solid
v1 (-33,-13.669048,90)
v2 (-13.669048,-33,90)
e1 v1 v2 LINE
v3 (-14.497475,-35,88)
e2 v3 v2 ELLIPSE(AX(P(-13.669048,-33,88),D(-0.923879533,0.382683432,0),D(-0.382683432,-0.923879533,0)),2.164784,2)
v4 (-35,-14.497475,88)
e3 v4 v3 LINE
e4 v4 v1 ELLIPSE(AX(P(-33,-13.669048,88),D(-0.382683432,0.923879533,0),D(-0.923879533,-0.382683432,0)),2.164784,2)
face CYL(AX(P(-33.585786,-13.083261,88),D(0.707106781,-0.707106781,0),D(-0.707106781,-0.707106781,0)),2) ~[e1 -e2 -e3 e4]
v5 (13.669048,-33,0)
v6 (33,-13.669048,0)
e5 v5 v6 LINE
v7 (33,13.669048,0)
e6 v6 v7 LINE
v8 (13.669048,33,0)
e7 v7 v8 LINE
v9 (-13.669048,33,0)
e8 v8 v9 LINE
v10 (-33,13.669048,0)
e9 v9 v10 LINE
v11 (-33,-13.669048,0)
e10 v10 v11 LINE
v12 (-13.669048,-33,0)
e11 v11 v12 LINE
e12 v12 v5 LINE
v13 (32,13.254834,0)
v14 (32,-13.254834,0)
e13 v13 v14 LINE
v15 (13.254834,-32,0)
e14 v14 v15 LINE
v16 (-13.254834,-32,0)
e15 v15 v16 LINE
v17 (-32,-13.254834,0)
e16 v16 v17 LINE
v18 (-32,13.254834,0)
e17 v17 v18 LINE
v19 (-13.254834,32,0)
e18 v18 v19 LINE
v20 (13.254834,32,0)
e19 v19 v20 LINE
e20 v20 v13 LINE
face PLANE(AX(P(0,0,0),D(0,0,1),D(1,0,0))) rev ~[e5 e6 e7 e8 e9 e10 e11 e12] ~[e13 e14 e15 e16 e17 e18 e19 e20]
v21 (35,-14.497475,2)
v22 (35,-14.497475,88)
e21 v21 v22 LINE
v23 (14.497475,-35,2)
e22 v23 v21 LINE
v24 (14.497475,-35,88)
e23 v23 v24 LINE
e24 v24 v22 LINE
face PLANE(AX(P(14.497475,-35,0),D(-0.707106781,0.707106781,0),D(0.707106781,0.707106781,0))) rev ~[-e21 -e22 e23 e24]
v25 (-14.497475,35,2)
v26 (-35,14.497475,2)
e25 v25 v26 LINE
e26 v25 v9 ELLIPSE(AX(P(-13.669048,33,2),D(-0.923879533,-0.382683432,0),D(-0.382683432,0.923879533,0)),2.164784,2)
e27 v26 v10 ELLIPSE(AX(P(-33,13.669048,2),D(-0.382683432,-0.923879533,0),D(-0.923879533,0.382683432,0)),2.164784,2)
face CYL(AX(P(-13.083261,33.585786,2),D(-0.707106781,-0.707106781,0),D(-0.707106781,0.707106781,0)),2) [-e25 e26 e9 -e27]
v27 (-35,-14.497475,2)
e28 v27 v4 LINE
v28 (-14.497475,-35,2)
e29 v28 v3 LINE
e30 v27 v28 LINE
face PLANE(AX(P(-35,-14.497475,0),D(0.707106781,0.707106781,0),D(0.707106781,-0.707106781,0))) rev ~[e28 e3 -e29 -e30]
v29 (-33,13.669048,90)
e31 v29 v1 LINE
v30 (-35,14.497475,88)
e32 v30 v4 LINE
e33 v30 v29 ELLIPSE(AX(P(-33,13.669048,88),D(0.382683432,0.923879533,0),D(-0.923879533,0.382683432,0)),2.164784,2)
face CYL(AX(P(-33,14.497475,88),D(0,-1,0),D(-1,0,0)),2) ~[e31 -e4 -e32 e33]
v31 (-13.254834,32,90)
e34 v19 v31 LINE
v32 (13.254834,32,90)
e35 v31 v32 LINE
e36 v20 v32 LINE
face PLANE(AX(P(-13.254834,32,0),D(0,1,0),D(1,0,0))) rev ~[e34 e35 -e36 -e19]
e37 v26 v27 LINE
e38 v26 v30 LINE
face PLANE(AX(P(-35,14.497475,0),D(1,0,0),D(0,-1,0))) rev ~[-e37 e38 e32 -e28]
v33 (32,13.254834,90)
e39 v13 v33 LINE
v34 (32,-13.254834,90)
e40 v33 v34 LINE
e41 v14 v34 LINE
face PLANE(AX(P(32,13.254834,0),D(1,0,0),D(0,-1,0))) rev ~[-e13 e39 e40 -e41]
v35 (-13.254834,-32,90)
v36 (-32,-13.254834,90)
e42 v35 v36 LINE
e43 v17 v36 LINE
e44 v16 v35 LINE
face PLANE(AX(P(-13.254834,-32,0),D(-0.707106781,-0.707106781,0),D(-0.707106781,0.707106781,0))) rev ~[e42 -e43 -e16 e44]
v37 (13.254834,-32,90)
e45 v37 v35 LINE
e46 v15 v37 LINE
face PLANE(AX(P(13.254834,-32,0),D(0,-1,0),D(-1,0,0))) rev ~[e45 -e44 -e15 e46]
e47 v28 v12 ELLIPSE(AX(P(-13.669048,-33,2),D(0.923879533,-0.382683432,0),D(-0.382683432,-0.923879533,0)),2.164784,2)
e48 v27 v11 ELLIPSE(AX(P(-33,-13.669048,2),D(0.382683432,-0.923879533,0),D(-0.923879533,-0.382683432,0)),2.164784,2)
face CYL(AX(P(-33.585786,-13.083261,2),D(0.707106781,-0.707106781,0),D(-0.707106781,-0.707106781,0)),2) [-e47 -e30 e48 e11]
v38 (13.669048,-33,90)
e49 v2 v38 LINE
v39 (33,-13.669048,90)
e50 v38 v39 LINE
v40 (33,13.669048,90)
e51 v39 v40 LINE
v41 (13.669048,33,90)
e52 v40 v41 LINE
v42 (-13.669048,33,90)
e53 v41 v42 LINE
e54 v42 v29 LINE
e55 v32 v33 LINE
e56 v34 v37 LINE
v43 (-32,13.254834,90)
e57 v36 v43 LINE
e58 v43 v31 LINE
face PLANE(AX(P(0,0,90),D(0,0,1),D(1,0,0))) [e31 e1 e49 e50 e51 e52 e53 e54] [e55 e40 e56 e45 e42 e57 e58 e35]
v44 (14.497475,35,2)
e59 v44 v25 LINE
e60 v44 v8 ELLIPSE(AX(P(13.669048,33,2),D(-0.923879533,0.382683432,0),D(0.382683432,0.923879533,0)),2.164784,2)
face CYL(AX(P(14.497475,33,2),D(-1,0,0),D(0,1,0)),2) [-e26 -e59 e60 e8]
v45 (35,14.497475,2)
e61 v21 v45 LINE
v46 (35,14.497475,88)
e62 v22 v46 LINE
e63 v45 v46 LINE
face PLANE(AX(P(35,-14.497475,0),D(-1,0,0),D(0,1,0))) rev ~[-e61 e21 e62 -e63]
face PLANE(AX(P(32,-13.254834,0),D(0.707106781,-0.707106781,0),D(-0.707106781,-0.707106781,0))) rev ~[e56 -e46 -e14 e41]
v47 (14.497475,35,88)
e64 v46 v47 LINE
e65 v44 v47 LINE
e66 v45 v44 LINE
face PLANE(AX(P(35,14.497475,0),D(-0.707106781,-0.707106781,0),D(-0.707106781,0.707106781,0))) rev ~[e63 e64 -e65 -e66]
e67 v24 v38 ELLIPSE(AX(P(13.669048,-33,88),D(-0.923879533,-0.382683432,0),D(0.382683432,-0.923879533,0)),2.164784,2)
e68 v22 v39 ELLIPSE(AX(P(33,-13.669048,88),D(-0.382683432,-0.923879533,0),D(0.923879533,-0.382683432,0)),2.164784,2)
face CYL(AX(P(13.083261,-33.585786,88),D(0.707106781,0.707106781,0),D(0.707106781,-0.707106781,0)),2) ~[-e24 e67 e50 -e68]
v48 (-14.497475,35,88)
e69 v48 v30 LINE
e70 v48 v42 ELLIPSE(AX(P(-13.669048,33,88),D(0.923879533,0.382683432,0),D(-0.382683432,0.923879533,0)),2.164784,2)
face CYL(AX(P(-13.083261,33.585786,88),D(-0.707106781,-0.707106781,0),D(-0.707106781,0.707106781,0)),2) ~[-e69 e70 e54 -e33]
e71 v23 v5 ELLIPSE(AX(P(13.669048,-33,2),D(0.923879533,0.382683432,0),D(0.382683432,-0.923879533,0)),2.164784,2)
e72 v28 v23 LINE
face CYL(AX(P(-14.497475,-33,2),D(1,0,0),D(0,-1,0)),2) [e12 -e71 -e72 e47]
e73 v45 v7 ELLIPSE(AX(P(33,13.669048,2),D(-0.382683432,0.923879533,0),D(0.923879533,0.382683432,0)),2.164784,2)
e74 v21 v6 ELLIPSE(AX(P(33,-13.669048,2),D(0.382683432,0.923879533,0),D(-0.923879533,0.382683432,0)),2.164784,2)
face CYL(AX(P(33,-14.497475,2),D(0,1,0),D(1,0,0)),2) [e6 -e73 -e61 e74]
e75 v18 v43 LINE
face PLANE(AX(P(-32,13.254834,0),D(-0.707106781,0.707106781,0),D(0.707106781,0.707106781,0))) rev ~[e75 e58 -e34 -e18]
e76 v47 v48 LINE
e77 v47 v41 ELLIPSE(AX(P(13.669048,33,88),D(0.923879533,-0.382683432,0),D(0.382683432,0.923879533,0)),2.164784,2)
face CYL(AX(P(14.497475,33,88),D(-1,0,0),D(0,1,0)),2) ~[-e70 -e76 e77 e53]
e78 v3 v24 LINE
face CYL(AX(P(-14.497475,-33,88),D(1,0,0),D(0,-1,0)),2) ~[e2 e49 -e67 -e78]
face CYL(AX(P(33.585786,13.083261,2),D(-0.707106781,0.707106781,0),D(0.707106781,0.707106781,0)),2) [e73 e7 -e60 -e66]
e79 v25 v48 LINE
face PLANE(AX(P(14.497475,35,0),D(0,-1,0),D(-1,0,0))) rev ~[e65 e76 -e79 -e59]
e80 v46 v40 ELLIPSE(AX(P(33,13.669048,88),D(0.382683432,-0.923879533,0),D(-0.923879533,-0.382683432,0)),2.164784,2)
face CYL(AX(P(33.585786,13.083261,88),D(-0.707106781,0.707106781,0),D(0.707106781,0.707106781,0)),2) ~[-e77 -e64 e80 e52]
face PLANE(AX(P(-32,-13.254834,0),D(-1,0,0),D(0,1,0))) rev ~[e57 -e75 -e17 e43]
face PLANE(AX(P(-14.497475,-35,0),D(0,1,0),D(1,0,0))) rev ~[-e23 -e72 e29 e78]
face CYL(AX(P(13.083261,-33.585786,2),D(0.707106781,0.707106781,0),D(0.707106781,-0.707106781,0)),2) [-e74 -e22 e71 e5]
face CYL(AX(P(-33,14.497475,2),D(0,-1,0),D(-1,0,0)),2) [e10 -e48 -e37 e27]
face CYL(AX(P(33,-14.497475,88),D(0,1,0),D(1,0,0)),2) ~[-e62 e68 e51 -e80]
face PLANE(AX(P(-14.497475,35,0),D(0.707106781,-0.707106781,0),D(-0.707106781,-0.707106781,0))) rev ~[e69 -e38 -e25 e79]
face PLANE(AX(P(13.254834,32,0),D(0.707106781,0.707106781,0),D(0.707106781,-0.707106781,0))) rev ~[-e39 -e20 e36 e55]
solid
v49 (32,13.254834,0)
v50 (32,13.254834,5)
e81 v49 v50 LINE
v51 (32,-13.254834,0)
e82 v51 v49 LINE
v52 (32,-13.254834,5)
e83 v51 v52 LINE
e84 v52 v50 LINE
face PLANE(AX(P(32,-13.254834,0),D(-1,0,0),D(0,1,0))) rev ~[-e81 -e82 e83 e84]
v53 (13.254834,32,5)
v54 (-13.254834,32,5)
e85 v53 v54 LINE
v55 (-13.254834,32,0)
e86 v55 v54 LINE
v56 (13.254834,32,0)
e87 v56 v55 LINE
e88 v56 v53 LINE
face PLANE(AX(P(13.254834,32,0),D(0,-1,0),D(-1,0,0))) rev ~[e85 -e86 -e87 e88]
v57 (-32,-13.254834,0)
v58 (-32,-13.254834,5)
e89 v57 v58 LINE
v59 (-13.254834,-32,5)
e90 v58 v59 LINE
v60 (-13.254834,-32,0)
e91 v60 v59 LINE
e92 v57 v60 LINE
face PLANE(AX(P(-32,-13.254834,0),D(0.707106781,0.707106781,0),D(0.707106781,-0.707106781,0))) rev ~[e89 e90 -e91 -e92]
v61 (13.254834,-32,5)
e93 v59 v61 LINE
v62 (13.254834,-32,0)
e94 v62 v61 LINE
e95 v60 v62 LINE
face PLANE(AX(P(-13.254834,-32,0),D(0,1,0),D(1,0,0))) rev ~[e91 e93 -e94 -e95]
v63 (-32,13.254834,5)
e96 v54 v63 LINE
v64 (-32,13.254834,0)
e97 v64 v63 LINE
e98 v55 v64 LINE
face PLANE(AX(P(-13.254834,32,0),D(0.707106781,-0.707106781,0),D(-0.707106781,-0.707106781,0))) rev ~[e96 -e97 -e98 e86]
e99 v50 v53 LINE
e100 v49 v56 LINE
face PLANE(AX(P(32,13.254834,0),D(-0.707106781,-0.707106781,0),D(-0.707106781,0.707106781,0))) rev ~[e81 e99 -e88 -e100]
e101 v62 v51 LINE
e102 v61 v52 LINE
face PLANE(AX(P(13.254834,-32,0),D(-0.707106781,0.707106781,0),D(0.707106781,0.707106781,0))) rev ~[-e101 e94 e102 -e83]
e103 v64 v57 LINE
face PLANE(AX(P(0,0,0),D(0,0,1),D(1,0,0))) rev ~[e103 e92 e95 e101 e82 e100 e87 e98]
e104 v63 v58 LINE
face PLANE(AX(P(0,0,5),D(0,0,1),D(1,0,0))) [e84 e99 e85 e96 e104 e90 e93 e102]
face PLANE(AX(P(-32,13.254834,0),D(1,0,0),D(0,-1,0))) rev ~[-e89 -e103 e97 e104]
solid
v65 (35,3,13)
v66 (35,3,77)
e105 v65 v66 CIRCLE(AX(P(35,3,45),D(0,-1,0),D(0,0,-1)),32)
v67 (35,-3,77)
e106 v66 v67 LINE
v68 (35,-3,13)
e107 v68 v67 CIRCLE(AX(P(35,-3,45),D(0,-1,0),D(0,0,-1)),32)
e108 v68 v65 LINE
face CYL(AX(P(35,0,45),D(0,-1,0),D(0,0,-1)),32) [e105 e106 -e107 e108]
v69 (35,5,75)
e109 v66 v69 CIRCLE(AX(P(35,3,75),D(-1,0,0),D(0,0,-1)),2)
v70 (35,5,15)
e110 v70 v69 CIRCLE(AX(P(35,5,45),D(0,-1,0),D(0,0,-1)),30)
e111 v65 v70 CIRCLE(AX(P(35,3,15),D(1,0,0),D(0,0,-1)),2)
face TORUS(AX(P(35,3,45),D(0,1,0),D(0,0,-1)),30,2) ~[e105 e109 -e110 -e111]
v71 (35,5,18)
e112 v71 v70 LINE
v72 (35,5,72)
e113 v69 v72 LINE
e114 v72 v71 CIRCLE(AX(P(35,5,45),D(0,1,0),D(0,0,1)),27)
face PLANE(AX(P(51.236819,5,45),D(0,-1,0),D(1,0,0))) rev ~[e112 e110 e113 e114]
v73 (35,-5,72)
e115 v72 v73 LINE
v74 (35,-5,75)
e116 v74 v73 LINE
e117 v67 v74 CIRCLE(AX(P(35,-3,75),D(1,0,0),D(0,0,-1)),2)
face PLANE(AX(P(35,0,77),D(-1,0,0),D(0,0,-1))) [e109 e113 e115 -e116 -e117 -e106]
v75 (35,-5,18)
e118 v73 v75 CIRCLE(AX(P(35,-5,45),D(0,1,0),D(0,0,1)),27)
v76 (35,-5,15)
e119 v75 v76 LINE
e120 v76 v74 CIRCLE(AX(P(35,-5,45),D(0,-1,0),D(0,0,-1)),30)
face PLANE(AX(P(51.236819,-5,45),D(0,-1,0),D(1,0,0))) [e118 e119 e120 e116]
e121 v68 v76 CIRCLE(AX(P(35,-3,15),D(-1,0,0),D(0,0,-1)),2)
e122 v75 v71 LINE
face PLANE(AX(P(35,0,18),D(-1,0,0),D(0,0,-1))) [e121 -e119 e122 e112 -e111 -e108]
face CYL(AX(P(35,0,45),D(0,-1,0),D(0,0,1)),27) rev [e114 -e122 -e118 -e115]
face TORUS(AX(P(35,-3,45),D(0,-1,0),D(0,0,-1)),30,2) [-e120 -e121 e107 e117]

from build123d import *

# Parameters (mm, degrees)
F1_DEPTH      = 90
F2_DEPTH      = 5
F4_DEPTH      = 5
F4_DEPTH_BACK = 5
F5_R          = 2
F5_2_R        = 2


# Not quite as in the source:
# - a feature names something its author has since deleted; it is built from what else it names


with BuildPart() as f1:
    # F0 (on Top) → F1 (new body)
    with BuildSketch(Plane.XY):
        Polygon((14.4974746831, 35), (-14.4974746831, 35), (-35, 14.4974746831), (-35, -14.4974746831), (-14.4974746831, -35), (14.4974746831, -35), (35, -14.4974746831), (35, 14.4974746831), align=None)
        Polygon((-32, 13.2548339959), (-13.2548339959, 32), (13.2548339959, 32), (32, 13.2548339959), (32, -13.2548339959), (13.2548339959, -32), (-13.2548339959, -32), (-32, -13.2548339959), align=None, mode=Mode.SUBTRACT)
    extrude(amount=F1_DEPTH)

    # F5
    f5_edges = [f1.edges().sort_by_distance(p)[0] for p in [
        (24.748737, 24.748737, 90),
        (0, 35, 90),
        (-24.748737, 24.748737, 90),
        (-35, 0, 90),
        (-24.748737, -24.748737, 90),
        (0, -35, 90),
        (24.748737, -24.748737, 90),
        (35, 0, 90),
        (35, 0, 0),
        (24.748737, 24.748737, 0),
        (0, 35, 0),
        (-24.748737, 24.748737, 0),
        (-35, 0, 0),
        (-24.748737, -24.748737, 0),
        (0, -35, 0),
        (24.748737, -24.748737, 0),
    ]]
    fillet(f5_edges, radius=F5_R)


with BuildPart() as f2:
    # F0 (on Top) → F2 (new body)
    with BuildSketch(Plane.XY):
        Polygon((13.2548339959, 32), (-13.2548339959, 32), (-32, 13.2548339959), (-32, -13.2548339959), (-13.2548339959, -32), (13.2548339959, -32), (32, -13.2548339959), (32, 13.2548339959), align=None)
    extrude(amount=F2_DEPTH)


with BuildPart() as f4:
    # F3 (on Front) → F4 (new body, two sides)
    with BuildSketch(Plane.XZ) as f4_sk:
        with BuildLine():
            ThreePointArc((35, 13), (67, 45), (35, 77))
            Line((35, 77), (35, 72))
            ThreePointArc((35, 72), (62, 45), (35, 18))
            Line((35, 18), (35, 13))
        make_face()
    extrude(amount=F4_DEPTH)
    extrude(f4_sk.sketch, amount=-F4_DEPTH_BACK)

    # F5#2
    f5_2_edges = [f4.edges().sort_by_distance(p)[0] for p in [
        (67, -5, 45),
        (67, 5, 45),
    ]]
    fillet(f5_2_edges, radius=F5_2_R)


solid = Compound([f1.part, f2.part, f4.part])
